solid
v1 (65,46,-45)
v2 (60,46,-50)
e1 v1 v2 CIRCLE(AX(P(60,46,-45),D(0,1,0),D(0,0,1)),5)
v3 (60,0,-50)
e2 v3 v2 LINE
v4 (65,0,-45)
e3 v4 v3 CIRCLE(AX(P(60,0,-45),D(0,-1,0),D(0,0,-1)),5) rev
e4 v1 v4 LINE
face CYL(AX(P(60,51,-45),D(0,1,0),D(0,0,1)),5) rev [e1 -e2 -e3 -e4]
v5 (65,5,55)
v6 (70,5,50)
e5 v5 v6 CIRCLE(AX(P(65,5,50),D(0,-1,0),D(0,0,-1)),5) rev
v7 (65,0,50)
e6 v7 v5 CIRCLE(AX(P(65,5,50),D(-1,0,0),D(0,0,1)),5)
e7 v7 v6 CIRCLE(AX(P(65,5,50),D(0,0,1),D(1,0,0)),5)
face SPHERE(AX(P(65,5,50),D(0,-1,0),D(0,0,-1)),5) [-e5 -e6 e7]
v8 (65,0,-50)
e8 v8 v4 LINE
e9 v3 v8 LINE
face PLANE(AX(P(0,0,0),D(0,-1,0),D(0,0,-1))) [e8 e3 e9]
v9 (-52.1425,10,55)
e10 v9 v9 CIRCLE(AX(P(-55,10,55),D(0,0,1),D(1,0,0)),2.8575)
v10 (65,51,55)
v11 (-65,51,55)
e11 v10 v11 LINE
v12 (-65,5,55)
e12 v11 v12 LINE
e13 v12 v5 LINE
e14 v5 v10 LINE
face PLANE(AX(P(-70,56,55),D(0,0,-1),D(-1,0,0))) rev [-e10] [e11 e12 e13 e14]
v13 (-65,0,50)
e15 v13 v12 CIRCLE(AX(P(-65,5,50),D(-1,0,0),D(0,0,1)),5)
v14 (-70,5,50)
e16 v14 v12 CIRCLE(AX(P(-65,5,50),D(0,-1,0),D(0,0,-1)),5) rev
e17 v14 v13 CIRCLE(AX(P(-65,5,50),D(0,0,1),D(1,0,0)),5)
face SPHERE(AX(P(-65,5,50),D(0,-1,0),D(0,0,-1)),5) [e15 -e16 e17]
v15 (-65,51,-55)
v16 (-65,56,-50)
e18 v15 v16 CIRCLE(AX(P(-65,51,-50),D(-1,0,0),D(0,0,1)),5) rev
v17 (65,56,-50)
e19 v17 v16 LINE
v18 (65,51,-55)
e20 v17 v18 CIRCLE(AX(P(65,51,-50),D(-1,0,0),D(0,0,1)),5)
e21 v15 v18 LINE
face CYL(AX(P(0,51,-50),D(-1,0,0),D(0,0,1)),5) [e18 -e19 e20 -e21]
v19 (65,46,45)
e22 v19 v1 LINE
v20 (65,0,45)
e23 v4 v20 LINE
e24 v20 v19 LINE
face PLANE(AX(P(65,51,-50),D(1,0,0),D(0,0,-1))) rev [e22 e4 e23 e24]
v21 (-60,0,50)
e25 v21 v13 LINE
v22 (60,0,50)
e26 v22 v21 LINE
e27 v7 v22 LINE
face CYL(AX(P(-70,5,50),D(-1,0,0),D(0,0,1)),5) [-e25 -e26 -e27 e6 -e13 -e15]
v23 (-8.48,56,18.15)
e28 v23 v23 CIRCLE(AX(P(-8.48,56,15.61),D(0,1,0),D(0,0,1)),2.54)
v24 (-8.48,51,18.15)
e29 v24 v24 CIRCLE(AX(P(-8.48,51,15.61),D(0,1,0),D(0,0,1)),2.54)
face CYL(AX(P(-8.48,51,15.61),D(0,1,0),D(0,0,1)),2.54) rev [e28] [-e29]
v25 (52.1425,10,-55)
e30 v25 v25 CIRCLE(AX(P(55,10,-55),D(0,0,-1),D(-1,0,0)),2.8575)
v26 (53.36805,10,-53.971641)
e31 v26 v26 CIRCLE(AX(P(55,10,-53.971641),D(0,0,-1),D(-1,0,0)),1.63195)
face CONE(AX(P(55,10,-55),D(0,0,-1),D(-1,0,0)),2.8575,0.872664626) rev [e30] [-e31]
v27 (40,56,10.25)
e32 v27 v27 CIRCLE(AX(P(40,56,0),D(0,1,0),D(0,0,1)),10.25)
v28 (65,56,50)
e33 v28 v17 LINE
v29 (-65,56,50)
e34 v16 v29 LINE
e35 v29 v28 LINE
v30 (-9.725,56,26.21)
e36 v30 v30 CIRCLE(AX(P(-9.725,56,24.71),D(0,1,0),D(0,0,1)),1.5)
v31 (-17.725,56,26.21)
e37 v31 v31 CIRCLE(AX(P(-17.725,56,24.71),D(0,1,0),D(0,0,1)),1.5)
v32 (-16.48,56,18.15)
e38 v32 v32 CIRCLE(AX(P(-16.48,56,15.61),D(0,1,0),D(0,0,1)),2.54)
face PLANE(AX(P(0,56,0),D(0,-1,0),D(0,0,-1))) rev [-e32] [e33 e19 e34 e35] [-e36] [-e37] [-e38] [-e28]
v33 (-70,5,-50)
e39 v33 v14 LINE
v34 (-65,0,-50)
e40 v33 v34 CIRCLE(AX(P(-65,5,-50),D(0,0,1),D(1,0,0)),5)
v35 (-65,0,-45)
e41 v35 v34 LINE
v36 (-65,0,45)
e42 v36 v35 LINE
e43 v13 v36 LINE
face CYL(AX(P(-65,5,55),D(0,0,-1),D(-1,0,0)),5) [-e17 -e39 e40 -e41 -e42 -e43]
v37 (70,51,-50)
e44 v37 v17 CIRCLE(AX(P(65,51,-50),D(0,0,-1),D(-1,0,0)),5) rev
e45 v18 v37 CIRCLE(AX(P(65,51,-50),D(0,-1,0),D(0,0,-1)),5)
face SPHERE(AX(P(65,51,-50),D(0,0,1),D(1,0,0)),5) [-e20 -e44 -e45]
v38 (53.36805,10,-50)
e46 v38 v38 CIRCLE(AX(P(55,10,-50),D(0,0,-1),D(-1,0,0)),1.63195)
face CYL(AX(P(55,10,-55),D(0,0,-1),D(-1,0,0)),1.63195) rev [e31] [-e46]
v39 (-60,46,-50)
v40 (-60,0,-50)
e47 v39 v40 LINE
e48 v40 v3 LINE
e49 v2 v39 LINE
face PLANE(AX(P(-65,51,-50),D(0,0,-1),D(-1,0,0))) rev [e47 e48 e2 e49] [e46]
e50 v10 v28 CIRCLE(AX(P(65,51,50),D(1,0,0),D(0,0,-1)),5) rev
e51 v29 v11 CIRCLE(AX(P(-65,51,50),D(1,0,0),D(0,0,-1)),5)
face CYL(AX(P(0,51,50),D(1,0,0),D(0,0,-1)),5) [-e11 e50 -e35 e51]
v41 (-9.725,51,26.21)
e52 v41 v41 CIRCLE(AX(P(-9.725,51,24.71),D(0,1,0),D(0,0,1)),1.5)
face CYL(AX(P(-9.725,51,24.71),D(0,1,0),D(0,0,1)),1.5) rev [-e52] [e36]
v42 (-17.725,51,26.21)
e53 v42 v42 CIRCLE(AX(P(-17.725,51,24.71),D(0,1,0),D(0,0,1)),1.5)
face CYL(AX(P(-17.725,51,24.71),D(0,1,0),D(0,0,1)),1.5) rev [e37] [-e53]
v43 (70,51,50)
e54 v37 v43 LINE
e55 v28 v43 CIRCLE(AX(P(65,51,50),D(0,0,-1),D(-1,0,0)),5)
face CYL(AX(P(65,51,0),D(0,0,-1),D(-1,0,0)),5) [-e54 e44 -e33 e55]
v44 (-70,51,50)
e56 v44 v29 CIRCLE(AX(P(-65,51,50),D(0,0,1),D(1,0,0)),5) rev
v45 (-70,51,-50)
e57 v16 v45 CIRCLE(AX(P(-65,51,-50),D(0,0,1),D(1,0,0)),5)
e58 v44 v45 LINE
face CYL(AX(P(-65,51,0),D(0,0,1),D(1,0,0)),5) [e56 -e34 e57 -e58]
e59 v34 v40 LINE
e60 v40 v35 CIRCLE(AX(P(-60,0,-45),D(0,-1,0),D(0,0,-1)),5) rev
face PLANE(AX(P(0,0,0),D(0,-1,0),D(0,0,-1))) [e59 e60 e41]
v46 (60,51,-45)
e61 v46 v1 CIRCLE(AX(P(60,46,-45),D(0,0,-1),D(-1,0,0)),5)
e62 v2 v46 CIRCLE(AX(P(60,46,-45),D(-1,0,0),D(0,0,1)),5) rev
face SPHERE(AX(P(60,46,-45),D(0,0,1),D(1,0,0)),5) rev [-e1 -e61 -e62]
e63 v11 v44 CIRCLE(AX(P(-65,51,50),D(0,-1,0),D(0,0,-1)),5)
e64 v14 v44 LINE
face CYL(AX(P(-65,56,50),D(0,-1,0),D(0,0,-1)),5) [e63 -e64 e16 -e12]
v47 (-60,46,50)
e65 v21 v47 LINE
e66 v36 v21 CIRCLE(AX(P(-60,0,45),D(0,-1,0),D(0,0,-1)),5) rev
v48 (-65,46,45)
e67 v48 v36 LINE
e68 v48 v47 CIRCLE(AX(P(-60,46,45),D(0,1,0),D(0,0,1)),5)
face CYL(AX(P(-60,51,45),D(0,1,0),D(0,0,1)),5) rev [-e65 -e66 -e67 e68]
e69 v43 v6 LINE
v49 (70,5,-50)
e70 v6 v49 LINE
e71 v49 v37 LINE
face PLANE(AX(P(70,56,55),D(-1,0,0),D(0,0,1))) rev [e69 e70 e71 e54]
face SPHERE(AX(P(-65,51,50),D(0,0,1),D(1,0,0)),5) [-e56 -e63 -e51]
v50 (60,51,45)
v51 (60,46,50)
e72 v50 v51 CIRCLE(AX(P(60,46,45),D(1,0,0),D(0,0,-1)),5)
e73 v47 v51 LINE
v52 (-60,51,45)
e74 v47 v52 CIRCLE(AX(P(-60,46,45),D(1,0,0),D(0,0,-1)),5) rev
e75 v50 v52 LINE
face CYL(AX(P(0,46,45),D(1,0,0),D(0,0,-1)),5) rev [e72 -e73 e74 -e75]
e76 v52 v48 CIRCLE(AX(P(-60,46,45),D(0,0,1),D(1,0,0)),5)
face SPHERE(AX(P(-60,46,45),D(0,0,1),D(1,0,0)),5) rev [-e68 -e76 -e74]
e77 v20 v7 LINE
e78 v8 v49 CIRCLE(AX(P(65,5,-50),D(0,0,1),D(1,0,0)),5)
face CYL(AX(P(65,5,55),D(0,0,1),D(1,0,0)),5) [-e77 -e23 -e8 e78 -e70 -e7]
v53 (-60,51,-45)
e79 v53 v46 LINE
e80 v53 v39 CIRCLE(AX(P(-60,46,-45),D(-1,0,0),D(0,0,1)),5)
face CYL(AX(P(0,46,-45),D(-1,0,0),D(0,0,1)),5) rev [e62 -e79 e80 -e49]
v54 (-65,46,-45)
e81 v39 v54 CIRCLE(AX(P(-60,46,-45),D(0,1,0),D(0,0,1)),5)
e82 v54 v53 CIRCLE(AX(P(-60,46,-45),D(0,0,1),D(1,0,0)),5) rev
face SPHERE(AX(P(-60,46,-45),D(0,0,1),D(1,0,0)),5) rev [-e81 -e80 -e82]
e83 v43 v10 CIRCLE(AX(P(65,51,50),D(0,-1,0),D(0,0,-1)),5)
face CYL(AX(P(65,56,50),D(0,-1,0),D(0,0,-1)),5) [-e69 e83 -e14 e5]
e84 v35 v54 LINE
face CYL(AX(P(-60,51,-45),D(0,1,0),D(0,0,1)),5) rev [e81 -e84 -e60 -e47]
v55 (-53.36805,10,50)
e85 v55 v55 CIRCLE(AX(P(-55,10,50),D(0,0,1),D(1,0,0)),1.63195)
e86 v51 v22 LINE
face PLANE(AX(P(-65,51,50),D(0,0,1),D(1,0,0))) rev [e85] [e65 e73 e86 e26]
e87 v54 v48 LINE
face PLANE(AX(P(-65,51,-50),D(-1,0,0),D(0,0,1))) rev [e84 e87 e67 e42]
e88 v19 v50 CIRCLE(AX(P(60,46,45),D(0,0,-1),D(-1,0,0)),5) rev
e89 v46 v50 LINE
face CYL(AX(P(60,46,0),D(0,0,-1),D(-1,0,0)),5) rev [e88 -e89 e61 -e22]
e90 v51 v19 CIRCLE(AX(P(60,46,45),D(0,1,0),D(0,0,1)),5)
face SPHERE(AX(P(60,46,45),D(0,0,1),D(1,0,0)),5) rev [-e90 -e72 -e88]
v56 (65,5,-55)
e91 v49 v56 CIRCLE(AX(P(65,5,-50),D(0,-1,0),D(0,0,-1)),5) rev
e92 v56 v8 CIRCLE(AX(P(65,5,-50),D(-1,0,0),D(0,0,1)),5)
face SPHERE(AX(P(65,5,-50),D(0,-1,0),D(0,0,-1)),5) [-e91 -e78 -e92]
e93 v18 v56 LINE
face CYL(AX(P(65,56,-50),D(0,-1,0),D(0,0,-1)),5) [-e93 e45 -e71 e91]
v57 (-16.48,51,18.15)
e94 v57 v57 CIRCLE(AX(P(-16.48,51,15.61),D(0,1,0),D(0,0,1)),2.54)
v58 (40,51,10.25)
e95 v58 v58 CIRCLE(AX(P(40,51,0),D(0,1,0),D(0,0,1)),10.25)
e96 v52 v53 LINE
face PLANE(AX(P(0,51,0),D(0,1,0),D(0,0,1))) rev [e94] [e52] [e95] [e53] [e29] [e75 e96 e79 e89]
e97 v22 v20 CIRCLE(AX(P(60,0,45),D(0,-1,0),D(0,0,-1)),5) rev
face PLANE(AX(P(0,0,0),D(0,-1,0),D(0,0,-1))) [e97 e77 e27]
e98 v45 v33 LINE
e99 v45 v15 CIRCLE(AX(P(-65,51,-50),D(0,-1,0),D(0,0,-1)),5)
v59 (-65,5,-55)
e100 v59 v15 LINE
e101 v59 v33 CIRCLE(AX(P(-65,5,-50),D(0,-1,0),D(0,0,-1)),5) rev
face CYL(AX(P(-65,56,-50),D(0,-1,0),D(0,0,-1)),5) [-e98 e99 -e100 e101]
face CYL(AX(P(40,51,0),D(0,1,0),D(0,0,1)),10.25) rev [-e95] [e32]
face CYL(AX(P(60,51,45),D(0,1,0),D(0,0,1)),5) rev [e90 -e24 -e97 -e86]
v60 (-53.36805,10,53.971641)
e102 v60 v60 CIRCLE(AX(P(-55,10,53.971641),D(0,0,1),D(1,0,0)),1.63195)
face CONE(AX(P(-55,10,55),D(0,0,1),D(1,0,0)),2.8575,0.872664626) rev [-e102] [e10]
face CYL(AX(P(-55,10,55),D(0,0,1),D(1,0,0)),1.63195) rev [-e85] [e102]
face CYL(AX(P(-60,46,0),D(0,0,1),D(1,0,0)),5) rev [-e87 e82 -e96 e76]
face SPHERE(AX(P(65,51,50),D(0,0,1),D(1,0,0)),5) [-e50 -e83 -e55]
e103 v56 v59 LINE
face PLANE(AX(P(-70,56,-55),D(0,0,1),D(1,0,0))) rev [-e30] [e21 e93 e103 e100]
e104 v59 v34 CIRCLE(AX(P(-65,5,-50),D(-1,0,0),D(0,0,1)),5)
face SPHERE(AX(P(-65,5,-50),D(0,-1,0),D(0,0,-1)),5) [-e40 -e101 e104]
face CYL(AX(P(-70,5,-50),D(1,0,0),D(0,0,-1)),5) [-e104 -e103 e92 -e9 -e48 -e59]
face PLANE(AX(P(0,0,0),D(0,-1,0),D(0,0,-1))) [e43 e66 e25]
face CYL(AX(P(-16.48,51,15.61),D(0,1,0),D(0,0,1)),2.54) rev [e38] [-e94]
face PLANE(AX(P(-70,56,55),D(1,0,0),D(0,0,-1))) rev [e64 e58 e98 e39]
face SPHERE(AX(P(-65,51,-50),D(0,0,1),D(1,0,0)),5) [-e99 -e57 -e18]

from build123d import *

# Parameters (mm, degrees)
SKETCH1_W                                         = 140
SKETCH1_H                                         = 110
BOSS_EXTRUDE1_DEPTH                               = 56
SKETCH2_W                                         = 130
SKETCH2_H                                         = 100
CUT_EXTRUDE1_DEPTH                                = 51
FILLET1_R                                         = 5
FILLET2_R                                         = 5
FILLET3_R                                         = 5
FILLET4_R                                         = 5
FILLET6_R                                         = 5
SKETCH3_R                                         = 2.54
CUT_EXTRUDE2_DEPTH                                = 5
SKETCH4_R                                         = 10.25
CUT_EXTRUDE3_DEPTH                                = 5
SKETCH5_R                                         = 1.5
CUT_EXTRUDE4_DEPTH                                = 5
CSK_FOR_4_FLAT_HEAD_MACHINE_SCREW_100_D           = 3.2639
CSK_FOR_4_FLAT_HEAD_MACHINE_SCREW_100_DEPTH       = 10
CSK_FOR_4_FLAT_HEAD_MACHINE_SCREW_100_CSINK_D     = 5.715
CSK_FOR_4_FLAT_HEAD_MACHINE_SCREW_100_CSINK_ANGLE = 100
CSK_FOR_4_FLAT_HEAD_MACHINE_SCREW_100_TIP         = 0.980574487
CSK_FOR_4_FLAT_HEAD_MACHINE_SCREW_2_D             = 3.2639
CSK_FOR_4_FLAT_HEAD_MACHINE_SCREW_2_DEPTH         = 10
CSK_FOR_4_FLAT_HEAD_MACHINE_SCREW_2_CSINK_D       = 5.715
CSK_FOR_4_FLAT_HEAD_MACHINE_SCREW_2_CSINK_ANGLE   = 100
CSK_FOR_4_FLAT_HEAD_MACHINE_SCREW_2_TIP           = 0.980574487


# Some blends are built 0.0001 mm under size
with BuildPart() as part:
    # Sketch1 → Boss-Extrude1 (new body)
    with BuildSketch(Plane(origin=(0, 0, 0), x_dir=(1, 0, 0), z_dir=(0, 1, 0))):
        Rectangle(SKETCH1_W, SKETCH1_H)
    extrude(amount=BOSS_EXTRUDE1_DEPTH)

    # Sketch2 → Cut-Extrude1 (cut)
    with BuildSketch(Plane.XZ):
        Rectangle(SKETCH2_W, SKETCH2_H)
    extrude(amount=-CUT_EXTRUDE1_DEPTH, mode=Mode.SUBTRACT)

    # Fillet1
    fillet1_edges = [part.edges().sort_by_distance(p)[0] for p in [
        (-70, 56, 0),
        (0, 56, 55),
        (70, 56, 0),
        (0, 56, -55),
    ]]
    fillet(fillet1_edges, radius=FILLET1_R)

    # Fillet2
    # the kernel refuses this fillet: 5 mm, written as the material it takes off along each edge
    with BuildSketch(Plane(origin=(65, 51, 50), x_dir=(1, 0, 0), z_dir=(0, 0, 1))) as fillet2_piece_1_section:
        Polygon((0, 0), (FILLET2_R, 0), (FILLET2_R, FILLET2_R), (0, FILLET2_R), align=None)
    fillet2_piece_1 = extrude(amount=FILLET2_R, mode=Mode.PRIVATE)
    fillet2_piece_1 = fillet2_piece_1 - Plane(origin=(65, 51, 50), x_dir=(-0.7071067811865475, -0.7071067811865475, 0), z_dir=(0, 0, 1)) * Sphere(FILLET2_R, mode=Mode.PRIVATE)
    add(fillet2_piece_1, mode=Mode.SUBTRACT)
    with BuildSketch(Plane(origin=(-65, 51, 50), x_dir=(-1, 0, 0), z_dir=(0, 0, 1))) as fillet2_piece_2_section:
        Polygon((0, 0), (FILLET2_R, 0), (FILLET2_R, -FILLET2_R), (0, -FILLET2_R), align=None)
    fillet2_piece_2 = extrude(amount=FILLET2_R, mode=Mode.PRIVATE)
    fillet2_piece_2 = fillet2_piece_2 - Plane(origin=(-65, 51, 50), x_dir=(0.7071067811865475, -0.7071067811865475, 0), z_dir=(0, 0, 1)) * Sphere(FILLET2_R, mode=Mode.PRIVATE)
    add(fillet2_piece_2, mode=Mode.SUBTRACT)
    with BuildSketch(Plane(origin=(65, 51, -50), x_dir=(0, 0, -1), z_dir=(1, 0, 0))) as fillet2_piece_3_section:
        Polygon((0, 0), (FILLET2_R, 0), (FILLET2_R, FILLET2_R), (0, FILLET2_R), align=None)
    fillet2_piece_3 = extrude(amount=FILLET2_R, mode=Mode.PRIVATE)
    fillet2_piece_3 = fillet2_piece_3 - Plane(origin=(65, 51, -50), x_dir=(0, -0.7071067811865475, 0.7071067811865475), z_dir=(1, 0, 0)) * Sphere(FILLET2_R, mode=Mode.PRIVATE)
    add(fillet2_piece_3, mode=Mode.SUBTRACT)
    with BuildSketch(Plane(origin=(-65, 51, -50), x_dir=(0, 0, -1), z_dir=(-1, 0, 0))) as fillet2_piece_4_section:
        Polygon((0, 0), (FILLET2_R, 0), (FILLET2_R, -FILLET2_R), (0, -FILLET2_R), align=None)
    fillet2_piece_4 = extrude(amount=FILLET2_R, mode=Mode.PRIVATE)
    fillet2_piece_4 = fillet2_piece_4 - Plane(origin=(-65, 51, -50), x_dir=(0, -0.7071067811865475, 0.7071067811865475), z_dir=(-1, 0, 0)) * Sphere(FILLET2_R, mode=Mode.PRIVATE)
    add(fillet2_piece_4, mode=Mode.SUBTRACT)
    with BuildSketch(Plane(origin=(-70, -12.5, -55), x_dir=(0, 0, 1), z_dir=(0, 1, 0)), Plane(origin=(-70, -12.5, 55), x_dir=(1, 0, 0), z_dir=(0, 1, 0))) as fillet2_piece_5:
        with BuildLine():
            CenterArc((FILLET2_R, FILLET2_R), FILLET2_R, 180, 90)
            Line((0, FILLET2_R), (0, 0))
            Line((0, 0), (FILLET2_R, 0))
        make_face()
    extrude(amount=63.5, mode=Mode.SUBTRACT)
    with BuildSketch(Plane(origin=(70, -12.5, -55), x_dir=(0, 0, 1), z_dir=(0, 1, 0)), Plane(origin=(70, -12.5, 55), x_dir=(-1, 0, 0), z_dir=(0, 1, 0))) as fillet2_piece_6:
        with BuildLine():
            CenterArc((FILLET2_R, -FILLET2_R), FILLET2_R, 90, 90)
            Line((0, -FILLET2_R), (0, 0))
            Line((0, 0), (FILLET2_R, 0))
        make_face()
    extrude(amount=63.5, mode=Mode.SUBTRACT)

    # Fillet3
    fillet3_edges = [part.edges().sort_by_distance(p)[0] for p in [
        (65, 51, 0),
        (0, 51, -50),
        (-65, 51, 0),
        (0, 51, 50),
    ]]
    fillet(fillet3_edges, radius=FILLET3_R)

    # Fillet4
    # the kernel refuses this fillet: 5 mm, written as the material it adds along each edge
    with BuildSketch(Plane(origin=(-60, 46, -45), x_dir=(0, 0, -1), z_dir=(-1, 0, 0))) as fillet4_piece_1_section:
        Polygon((0, 0), (FILLET4_R, 0), (FILLET4_R, -FILLET4_R), (0, -FILLET4_R), align=None)
    fillet4_piece_1 = extrude(amount=FILLET4_R, mode=Mode.PRIVATE)
    fillet4_piece_1 = fillet4_piece_1 - Plane(origin=(-60, 46, -45), x_dir=(0, -0.7071067811865475, 0.7071067811865475), z_dir=(-1, 0, 0)) * Sphere(FILLET4_R, mode=Mode.PRIVATE)
    add(fillet4_piece_1)
    with BuildSketch(Plane(origin=(-60, 46, 45), x_dir=(0, 0, 1), z_dir=(-1, 0, 0))) as fillet4_piece_2_section:
        Polygon((0, 0), (FILLET4_R, 0), (FILLET4_R, FILLET4_R), (0, FILLET4_R), align=None)
    fillet4_piece_2 = extrude(amount=FILLET4_R, mode=Mode.PRIVATE)
    fillet4_piece_2 = fillet4_piece_2 - Plane(origin=(-60, 46, 45), x_dir=(0, -0.7071067811865475, -0.7071067811865475), z_dir=(-1, 0, 0)) * Sphere(FILLET4_R, mode=Mode.PRIVATE)
    add(fillet4_piece_2)
    with BuildSketch(Plane(origin=(60, 46, -45), x_dir=(1, 0, 0), z_dir=(0, 0, -1))) as fillet4_piece_3_section:
        Polygon((0, 0), (FILLET4_R, 0), (FILLET4_R, -FILLET4_R), (0, -FILLET4_R), align=None)
    fillet4_piece_3 = extrude(amount=FILLET4_R, mode=Mode.PRIVATE)
    fillet4_piece_3 = fillet4_piece_3 - Plane(origin=(60, 46, -45), x_dir=(-0.7071067811865475, -0.7071067811865475, 0), z_dir=(0, 0, -1)) * Sphere(FILLET4_R, mode=Mode.PRIVATE)
    add(fillet4_piece_3)
    with BuildSketch(Plane(origin=(60, 46, 45), x_dir=(1, 0, 0), z_dir=(0, 0, 1))) as fillet4_piece_4_section:
        Polygon((0, 0), (FILLET4_R, 0), (FILLET4_R, FILLET4_R), (0, FILLET4_R), align=None)
    fillet4_piece_4 = extrude(amount=FILLET4_R, mode=Mode.PRIVATE)
    fillet4_piece_4 = fillet4_piece_4 - Plane(origin=(60, 46, 45), x_dir=(-0.7071067811865475, -0.7071067811865475, 0), z_dir=(0, 0, 1)) * Sphere(FILLET4_R, mode=Mode.PRIVATE)
    add(fillet4_piece_4)
    with BuildSketch(Plane(origin=(65, 0, 50), x_dir=(-1, 0, 0), z_dir=(0, 1, 0)), Plane(origin=(-65, 0, 50), x_dir=(0, 0, -1), z_dir=(0, 1, 0))) as fillet4_piece_5:
        with BuildLine():
            CenterArc((FILLET4_R, -FILLET4_R), FILLET4_R, 90, 90)
            Line((0, -FILLET4_R), (0, 0))
            Line((0, 0), (FILLET4_R, 0))
        make_face()
    extrude(amount=46)
    with BuildSketch(Plane(origin=(65, 0, -50), x_dir=(-1, 0, 0), z_dir=(0, 1, 0)), Plane(origin=(-65, 0, -50), x_dir=(0, 0, 1), z_dir=(0, 1, 0))) as fillet4_piece_6:
        with BuildLine():
            CenterArc((FILLET4_R, FILLET4_R), FILLET4_R, 180, 90)
            Line((0, FILLET4_R), (0, 0))
            Line((0, 0), (FILLET4_R, 0))
        make_face()
    extrude(amount=46)

    # Fillet6
    fillet6_edges = [part.edges().sort_by_distance(p)[0] for p in [
        (-70, 0, 0),
        (70, 0, 0),
        (0, 0, 55),
        (0, 0, -55),
        (-68.535533906, 0, 53.535533906),
        (68.535533906, 0, 53.535533906),
        (68.535533906, 0, -53.535533906),
        (-68.535533906, 0, -53.535533906),
    ]]
    fillet(fillet6_edges, radius=FILLET6_R - 0.0001)  # a hair under: the kernel refuses the full size

    # Sketch3 → Cut-Extrude2 (cut)
    with BuildSketch(Plane(origin=(0, 56, 0), x_dir=(1, 0, 0), z_dir=(0, 1, 0))):
        with Locations(Location((-16.48, -15.61, 0), (0, 0, 270))):
            Circle(SKETCH3_R)
        with Locations(Location((-8.48, -15.61, 0), (0, 0, 270))):
            Circle(SKETCH3_R)
    extrude(amount=-CUT_EXTRUDE2_DEPTH, mode=Mode.SUBTRACT)

    # Sketch4 → Cut-Extrude3 (cut)
    with BuildSketch(Plane(origin=(0, 56, 0), x_dir=(1, 0, 0), z_dir=(0, 1, 0))):
        with Locations(Location((40, 0, 0), (0, 0, 270))):
            Circle(SKETCH4_R)
    extrude(amount=-CUT_EXTRUDE3_DEPTH, mode=Mode.SUBTRACT)

    # Sketch5 → Cut-Extrude4 (cut)
    with BuildSketch(Plane(origin=(0, 56, 0), x_dir=(1, 0, 0), z_dir=(0, 1, 0))):
        with Locations(Location((-17.725, -24.71, 0), (0, 0, 270))):
            Circle(SKETCH5_R)
        with Locations(Location((-9.725, -24.71, 0), (0, 0, 270))):
            Circle(SKETCH5_R)
    extrude(amount=-CUT_EXTRUDE4_DEPTH, mode=Mode.SUBTRACT)

    # CSK for _4 Flat Head Machine Screw _100
    with Locations(Plane(origin=(58.965440854, 7.381222334, 55), x_dir=(1, 0, 0), z_dir=(0, 0, 1))):
        with Locations((-113.965440854, 2.618777666)):
            CounterSinkHole(CSK_FOR_4_FLAT_HEAD_MACHINE_SCREW_100_D / 2, CSK_FOR_4_FLAT_HEAD_MACHINE_SCREW_100_CSINK_D / 2, depth=CSK_FOR_4_FLAT_HEAD_MACHINE_SCREW_100_DEPTH, counter_sink_angle=CSK_FOR_4_FLAT_HEAD_MACHINE_SCREW_100_CSINK_ANGLE)
            with Locations((0, 0, -(CSK_FOR_4_FLAT_HEAD_MACHINE_SCREW_100_DEPTH + CSK_FOR_4_FLAT_HEAD_MACHINE_SCREW_100_TIP / 2))):  # 118° drill point
                Cone(0, CSK_FOR_4_FLAT_HEAD_MACHINE_SCREW_100_D / 2, CSK_FOR_4_FLAT_HEAD_MACHINE_SCREW_100_TIP, mode=Mode.SUBTRACT)

    # CSK for _4 Flat Head Machine Screw _ 2
    with Locations(Plane(origin=(58.965440854, 7.381222334, -55), x_dir=(-1, 0, 0), z_dir=(0, 0, -1))):
        with Locations((3.965440854, 2.618777666)):
            CounterSinkHole(CSK_FOR_4_FLAT_HEAD_MACHINE_SCREW_2_D / 2, CSK_FOR_4_FLAT_HEAD_MACHINE_SCREW_2_CSINK_D / 2, depth=CSK_FOR_4_FLAT_HEAD_MACHINE_SCREW_2_DEPTH, counter_sink_angle=CSK_FOR_4_FLAT_HEAD_MACHINE_SCREW_2_CSINK_ANGLE)
            with Locations((0, 0, -(CSK_FOR_4_FLAT_HEAD_MACHINE_SCREW_2_DEPTH + CSK_FOR_4_FLAT_HEAD_MACHINE_SCREW_2_TIP / 2))):  # 118° drill point
                Cone(0, CSK_FOR_4_FLAT_HEAD_MACHINE_SCREW_2_D / 2, CSK_FOR_4_FLAT_HEAD_MACHINE_SCREW_2_TIP, mode=Mode.SUBTRACT)


solid = part.part
